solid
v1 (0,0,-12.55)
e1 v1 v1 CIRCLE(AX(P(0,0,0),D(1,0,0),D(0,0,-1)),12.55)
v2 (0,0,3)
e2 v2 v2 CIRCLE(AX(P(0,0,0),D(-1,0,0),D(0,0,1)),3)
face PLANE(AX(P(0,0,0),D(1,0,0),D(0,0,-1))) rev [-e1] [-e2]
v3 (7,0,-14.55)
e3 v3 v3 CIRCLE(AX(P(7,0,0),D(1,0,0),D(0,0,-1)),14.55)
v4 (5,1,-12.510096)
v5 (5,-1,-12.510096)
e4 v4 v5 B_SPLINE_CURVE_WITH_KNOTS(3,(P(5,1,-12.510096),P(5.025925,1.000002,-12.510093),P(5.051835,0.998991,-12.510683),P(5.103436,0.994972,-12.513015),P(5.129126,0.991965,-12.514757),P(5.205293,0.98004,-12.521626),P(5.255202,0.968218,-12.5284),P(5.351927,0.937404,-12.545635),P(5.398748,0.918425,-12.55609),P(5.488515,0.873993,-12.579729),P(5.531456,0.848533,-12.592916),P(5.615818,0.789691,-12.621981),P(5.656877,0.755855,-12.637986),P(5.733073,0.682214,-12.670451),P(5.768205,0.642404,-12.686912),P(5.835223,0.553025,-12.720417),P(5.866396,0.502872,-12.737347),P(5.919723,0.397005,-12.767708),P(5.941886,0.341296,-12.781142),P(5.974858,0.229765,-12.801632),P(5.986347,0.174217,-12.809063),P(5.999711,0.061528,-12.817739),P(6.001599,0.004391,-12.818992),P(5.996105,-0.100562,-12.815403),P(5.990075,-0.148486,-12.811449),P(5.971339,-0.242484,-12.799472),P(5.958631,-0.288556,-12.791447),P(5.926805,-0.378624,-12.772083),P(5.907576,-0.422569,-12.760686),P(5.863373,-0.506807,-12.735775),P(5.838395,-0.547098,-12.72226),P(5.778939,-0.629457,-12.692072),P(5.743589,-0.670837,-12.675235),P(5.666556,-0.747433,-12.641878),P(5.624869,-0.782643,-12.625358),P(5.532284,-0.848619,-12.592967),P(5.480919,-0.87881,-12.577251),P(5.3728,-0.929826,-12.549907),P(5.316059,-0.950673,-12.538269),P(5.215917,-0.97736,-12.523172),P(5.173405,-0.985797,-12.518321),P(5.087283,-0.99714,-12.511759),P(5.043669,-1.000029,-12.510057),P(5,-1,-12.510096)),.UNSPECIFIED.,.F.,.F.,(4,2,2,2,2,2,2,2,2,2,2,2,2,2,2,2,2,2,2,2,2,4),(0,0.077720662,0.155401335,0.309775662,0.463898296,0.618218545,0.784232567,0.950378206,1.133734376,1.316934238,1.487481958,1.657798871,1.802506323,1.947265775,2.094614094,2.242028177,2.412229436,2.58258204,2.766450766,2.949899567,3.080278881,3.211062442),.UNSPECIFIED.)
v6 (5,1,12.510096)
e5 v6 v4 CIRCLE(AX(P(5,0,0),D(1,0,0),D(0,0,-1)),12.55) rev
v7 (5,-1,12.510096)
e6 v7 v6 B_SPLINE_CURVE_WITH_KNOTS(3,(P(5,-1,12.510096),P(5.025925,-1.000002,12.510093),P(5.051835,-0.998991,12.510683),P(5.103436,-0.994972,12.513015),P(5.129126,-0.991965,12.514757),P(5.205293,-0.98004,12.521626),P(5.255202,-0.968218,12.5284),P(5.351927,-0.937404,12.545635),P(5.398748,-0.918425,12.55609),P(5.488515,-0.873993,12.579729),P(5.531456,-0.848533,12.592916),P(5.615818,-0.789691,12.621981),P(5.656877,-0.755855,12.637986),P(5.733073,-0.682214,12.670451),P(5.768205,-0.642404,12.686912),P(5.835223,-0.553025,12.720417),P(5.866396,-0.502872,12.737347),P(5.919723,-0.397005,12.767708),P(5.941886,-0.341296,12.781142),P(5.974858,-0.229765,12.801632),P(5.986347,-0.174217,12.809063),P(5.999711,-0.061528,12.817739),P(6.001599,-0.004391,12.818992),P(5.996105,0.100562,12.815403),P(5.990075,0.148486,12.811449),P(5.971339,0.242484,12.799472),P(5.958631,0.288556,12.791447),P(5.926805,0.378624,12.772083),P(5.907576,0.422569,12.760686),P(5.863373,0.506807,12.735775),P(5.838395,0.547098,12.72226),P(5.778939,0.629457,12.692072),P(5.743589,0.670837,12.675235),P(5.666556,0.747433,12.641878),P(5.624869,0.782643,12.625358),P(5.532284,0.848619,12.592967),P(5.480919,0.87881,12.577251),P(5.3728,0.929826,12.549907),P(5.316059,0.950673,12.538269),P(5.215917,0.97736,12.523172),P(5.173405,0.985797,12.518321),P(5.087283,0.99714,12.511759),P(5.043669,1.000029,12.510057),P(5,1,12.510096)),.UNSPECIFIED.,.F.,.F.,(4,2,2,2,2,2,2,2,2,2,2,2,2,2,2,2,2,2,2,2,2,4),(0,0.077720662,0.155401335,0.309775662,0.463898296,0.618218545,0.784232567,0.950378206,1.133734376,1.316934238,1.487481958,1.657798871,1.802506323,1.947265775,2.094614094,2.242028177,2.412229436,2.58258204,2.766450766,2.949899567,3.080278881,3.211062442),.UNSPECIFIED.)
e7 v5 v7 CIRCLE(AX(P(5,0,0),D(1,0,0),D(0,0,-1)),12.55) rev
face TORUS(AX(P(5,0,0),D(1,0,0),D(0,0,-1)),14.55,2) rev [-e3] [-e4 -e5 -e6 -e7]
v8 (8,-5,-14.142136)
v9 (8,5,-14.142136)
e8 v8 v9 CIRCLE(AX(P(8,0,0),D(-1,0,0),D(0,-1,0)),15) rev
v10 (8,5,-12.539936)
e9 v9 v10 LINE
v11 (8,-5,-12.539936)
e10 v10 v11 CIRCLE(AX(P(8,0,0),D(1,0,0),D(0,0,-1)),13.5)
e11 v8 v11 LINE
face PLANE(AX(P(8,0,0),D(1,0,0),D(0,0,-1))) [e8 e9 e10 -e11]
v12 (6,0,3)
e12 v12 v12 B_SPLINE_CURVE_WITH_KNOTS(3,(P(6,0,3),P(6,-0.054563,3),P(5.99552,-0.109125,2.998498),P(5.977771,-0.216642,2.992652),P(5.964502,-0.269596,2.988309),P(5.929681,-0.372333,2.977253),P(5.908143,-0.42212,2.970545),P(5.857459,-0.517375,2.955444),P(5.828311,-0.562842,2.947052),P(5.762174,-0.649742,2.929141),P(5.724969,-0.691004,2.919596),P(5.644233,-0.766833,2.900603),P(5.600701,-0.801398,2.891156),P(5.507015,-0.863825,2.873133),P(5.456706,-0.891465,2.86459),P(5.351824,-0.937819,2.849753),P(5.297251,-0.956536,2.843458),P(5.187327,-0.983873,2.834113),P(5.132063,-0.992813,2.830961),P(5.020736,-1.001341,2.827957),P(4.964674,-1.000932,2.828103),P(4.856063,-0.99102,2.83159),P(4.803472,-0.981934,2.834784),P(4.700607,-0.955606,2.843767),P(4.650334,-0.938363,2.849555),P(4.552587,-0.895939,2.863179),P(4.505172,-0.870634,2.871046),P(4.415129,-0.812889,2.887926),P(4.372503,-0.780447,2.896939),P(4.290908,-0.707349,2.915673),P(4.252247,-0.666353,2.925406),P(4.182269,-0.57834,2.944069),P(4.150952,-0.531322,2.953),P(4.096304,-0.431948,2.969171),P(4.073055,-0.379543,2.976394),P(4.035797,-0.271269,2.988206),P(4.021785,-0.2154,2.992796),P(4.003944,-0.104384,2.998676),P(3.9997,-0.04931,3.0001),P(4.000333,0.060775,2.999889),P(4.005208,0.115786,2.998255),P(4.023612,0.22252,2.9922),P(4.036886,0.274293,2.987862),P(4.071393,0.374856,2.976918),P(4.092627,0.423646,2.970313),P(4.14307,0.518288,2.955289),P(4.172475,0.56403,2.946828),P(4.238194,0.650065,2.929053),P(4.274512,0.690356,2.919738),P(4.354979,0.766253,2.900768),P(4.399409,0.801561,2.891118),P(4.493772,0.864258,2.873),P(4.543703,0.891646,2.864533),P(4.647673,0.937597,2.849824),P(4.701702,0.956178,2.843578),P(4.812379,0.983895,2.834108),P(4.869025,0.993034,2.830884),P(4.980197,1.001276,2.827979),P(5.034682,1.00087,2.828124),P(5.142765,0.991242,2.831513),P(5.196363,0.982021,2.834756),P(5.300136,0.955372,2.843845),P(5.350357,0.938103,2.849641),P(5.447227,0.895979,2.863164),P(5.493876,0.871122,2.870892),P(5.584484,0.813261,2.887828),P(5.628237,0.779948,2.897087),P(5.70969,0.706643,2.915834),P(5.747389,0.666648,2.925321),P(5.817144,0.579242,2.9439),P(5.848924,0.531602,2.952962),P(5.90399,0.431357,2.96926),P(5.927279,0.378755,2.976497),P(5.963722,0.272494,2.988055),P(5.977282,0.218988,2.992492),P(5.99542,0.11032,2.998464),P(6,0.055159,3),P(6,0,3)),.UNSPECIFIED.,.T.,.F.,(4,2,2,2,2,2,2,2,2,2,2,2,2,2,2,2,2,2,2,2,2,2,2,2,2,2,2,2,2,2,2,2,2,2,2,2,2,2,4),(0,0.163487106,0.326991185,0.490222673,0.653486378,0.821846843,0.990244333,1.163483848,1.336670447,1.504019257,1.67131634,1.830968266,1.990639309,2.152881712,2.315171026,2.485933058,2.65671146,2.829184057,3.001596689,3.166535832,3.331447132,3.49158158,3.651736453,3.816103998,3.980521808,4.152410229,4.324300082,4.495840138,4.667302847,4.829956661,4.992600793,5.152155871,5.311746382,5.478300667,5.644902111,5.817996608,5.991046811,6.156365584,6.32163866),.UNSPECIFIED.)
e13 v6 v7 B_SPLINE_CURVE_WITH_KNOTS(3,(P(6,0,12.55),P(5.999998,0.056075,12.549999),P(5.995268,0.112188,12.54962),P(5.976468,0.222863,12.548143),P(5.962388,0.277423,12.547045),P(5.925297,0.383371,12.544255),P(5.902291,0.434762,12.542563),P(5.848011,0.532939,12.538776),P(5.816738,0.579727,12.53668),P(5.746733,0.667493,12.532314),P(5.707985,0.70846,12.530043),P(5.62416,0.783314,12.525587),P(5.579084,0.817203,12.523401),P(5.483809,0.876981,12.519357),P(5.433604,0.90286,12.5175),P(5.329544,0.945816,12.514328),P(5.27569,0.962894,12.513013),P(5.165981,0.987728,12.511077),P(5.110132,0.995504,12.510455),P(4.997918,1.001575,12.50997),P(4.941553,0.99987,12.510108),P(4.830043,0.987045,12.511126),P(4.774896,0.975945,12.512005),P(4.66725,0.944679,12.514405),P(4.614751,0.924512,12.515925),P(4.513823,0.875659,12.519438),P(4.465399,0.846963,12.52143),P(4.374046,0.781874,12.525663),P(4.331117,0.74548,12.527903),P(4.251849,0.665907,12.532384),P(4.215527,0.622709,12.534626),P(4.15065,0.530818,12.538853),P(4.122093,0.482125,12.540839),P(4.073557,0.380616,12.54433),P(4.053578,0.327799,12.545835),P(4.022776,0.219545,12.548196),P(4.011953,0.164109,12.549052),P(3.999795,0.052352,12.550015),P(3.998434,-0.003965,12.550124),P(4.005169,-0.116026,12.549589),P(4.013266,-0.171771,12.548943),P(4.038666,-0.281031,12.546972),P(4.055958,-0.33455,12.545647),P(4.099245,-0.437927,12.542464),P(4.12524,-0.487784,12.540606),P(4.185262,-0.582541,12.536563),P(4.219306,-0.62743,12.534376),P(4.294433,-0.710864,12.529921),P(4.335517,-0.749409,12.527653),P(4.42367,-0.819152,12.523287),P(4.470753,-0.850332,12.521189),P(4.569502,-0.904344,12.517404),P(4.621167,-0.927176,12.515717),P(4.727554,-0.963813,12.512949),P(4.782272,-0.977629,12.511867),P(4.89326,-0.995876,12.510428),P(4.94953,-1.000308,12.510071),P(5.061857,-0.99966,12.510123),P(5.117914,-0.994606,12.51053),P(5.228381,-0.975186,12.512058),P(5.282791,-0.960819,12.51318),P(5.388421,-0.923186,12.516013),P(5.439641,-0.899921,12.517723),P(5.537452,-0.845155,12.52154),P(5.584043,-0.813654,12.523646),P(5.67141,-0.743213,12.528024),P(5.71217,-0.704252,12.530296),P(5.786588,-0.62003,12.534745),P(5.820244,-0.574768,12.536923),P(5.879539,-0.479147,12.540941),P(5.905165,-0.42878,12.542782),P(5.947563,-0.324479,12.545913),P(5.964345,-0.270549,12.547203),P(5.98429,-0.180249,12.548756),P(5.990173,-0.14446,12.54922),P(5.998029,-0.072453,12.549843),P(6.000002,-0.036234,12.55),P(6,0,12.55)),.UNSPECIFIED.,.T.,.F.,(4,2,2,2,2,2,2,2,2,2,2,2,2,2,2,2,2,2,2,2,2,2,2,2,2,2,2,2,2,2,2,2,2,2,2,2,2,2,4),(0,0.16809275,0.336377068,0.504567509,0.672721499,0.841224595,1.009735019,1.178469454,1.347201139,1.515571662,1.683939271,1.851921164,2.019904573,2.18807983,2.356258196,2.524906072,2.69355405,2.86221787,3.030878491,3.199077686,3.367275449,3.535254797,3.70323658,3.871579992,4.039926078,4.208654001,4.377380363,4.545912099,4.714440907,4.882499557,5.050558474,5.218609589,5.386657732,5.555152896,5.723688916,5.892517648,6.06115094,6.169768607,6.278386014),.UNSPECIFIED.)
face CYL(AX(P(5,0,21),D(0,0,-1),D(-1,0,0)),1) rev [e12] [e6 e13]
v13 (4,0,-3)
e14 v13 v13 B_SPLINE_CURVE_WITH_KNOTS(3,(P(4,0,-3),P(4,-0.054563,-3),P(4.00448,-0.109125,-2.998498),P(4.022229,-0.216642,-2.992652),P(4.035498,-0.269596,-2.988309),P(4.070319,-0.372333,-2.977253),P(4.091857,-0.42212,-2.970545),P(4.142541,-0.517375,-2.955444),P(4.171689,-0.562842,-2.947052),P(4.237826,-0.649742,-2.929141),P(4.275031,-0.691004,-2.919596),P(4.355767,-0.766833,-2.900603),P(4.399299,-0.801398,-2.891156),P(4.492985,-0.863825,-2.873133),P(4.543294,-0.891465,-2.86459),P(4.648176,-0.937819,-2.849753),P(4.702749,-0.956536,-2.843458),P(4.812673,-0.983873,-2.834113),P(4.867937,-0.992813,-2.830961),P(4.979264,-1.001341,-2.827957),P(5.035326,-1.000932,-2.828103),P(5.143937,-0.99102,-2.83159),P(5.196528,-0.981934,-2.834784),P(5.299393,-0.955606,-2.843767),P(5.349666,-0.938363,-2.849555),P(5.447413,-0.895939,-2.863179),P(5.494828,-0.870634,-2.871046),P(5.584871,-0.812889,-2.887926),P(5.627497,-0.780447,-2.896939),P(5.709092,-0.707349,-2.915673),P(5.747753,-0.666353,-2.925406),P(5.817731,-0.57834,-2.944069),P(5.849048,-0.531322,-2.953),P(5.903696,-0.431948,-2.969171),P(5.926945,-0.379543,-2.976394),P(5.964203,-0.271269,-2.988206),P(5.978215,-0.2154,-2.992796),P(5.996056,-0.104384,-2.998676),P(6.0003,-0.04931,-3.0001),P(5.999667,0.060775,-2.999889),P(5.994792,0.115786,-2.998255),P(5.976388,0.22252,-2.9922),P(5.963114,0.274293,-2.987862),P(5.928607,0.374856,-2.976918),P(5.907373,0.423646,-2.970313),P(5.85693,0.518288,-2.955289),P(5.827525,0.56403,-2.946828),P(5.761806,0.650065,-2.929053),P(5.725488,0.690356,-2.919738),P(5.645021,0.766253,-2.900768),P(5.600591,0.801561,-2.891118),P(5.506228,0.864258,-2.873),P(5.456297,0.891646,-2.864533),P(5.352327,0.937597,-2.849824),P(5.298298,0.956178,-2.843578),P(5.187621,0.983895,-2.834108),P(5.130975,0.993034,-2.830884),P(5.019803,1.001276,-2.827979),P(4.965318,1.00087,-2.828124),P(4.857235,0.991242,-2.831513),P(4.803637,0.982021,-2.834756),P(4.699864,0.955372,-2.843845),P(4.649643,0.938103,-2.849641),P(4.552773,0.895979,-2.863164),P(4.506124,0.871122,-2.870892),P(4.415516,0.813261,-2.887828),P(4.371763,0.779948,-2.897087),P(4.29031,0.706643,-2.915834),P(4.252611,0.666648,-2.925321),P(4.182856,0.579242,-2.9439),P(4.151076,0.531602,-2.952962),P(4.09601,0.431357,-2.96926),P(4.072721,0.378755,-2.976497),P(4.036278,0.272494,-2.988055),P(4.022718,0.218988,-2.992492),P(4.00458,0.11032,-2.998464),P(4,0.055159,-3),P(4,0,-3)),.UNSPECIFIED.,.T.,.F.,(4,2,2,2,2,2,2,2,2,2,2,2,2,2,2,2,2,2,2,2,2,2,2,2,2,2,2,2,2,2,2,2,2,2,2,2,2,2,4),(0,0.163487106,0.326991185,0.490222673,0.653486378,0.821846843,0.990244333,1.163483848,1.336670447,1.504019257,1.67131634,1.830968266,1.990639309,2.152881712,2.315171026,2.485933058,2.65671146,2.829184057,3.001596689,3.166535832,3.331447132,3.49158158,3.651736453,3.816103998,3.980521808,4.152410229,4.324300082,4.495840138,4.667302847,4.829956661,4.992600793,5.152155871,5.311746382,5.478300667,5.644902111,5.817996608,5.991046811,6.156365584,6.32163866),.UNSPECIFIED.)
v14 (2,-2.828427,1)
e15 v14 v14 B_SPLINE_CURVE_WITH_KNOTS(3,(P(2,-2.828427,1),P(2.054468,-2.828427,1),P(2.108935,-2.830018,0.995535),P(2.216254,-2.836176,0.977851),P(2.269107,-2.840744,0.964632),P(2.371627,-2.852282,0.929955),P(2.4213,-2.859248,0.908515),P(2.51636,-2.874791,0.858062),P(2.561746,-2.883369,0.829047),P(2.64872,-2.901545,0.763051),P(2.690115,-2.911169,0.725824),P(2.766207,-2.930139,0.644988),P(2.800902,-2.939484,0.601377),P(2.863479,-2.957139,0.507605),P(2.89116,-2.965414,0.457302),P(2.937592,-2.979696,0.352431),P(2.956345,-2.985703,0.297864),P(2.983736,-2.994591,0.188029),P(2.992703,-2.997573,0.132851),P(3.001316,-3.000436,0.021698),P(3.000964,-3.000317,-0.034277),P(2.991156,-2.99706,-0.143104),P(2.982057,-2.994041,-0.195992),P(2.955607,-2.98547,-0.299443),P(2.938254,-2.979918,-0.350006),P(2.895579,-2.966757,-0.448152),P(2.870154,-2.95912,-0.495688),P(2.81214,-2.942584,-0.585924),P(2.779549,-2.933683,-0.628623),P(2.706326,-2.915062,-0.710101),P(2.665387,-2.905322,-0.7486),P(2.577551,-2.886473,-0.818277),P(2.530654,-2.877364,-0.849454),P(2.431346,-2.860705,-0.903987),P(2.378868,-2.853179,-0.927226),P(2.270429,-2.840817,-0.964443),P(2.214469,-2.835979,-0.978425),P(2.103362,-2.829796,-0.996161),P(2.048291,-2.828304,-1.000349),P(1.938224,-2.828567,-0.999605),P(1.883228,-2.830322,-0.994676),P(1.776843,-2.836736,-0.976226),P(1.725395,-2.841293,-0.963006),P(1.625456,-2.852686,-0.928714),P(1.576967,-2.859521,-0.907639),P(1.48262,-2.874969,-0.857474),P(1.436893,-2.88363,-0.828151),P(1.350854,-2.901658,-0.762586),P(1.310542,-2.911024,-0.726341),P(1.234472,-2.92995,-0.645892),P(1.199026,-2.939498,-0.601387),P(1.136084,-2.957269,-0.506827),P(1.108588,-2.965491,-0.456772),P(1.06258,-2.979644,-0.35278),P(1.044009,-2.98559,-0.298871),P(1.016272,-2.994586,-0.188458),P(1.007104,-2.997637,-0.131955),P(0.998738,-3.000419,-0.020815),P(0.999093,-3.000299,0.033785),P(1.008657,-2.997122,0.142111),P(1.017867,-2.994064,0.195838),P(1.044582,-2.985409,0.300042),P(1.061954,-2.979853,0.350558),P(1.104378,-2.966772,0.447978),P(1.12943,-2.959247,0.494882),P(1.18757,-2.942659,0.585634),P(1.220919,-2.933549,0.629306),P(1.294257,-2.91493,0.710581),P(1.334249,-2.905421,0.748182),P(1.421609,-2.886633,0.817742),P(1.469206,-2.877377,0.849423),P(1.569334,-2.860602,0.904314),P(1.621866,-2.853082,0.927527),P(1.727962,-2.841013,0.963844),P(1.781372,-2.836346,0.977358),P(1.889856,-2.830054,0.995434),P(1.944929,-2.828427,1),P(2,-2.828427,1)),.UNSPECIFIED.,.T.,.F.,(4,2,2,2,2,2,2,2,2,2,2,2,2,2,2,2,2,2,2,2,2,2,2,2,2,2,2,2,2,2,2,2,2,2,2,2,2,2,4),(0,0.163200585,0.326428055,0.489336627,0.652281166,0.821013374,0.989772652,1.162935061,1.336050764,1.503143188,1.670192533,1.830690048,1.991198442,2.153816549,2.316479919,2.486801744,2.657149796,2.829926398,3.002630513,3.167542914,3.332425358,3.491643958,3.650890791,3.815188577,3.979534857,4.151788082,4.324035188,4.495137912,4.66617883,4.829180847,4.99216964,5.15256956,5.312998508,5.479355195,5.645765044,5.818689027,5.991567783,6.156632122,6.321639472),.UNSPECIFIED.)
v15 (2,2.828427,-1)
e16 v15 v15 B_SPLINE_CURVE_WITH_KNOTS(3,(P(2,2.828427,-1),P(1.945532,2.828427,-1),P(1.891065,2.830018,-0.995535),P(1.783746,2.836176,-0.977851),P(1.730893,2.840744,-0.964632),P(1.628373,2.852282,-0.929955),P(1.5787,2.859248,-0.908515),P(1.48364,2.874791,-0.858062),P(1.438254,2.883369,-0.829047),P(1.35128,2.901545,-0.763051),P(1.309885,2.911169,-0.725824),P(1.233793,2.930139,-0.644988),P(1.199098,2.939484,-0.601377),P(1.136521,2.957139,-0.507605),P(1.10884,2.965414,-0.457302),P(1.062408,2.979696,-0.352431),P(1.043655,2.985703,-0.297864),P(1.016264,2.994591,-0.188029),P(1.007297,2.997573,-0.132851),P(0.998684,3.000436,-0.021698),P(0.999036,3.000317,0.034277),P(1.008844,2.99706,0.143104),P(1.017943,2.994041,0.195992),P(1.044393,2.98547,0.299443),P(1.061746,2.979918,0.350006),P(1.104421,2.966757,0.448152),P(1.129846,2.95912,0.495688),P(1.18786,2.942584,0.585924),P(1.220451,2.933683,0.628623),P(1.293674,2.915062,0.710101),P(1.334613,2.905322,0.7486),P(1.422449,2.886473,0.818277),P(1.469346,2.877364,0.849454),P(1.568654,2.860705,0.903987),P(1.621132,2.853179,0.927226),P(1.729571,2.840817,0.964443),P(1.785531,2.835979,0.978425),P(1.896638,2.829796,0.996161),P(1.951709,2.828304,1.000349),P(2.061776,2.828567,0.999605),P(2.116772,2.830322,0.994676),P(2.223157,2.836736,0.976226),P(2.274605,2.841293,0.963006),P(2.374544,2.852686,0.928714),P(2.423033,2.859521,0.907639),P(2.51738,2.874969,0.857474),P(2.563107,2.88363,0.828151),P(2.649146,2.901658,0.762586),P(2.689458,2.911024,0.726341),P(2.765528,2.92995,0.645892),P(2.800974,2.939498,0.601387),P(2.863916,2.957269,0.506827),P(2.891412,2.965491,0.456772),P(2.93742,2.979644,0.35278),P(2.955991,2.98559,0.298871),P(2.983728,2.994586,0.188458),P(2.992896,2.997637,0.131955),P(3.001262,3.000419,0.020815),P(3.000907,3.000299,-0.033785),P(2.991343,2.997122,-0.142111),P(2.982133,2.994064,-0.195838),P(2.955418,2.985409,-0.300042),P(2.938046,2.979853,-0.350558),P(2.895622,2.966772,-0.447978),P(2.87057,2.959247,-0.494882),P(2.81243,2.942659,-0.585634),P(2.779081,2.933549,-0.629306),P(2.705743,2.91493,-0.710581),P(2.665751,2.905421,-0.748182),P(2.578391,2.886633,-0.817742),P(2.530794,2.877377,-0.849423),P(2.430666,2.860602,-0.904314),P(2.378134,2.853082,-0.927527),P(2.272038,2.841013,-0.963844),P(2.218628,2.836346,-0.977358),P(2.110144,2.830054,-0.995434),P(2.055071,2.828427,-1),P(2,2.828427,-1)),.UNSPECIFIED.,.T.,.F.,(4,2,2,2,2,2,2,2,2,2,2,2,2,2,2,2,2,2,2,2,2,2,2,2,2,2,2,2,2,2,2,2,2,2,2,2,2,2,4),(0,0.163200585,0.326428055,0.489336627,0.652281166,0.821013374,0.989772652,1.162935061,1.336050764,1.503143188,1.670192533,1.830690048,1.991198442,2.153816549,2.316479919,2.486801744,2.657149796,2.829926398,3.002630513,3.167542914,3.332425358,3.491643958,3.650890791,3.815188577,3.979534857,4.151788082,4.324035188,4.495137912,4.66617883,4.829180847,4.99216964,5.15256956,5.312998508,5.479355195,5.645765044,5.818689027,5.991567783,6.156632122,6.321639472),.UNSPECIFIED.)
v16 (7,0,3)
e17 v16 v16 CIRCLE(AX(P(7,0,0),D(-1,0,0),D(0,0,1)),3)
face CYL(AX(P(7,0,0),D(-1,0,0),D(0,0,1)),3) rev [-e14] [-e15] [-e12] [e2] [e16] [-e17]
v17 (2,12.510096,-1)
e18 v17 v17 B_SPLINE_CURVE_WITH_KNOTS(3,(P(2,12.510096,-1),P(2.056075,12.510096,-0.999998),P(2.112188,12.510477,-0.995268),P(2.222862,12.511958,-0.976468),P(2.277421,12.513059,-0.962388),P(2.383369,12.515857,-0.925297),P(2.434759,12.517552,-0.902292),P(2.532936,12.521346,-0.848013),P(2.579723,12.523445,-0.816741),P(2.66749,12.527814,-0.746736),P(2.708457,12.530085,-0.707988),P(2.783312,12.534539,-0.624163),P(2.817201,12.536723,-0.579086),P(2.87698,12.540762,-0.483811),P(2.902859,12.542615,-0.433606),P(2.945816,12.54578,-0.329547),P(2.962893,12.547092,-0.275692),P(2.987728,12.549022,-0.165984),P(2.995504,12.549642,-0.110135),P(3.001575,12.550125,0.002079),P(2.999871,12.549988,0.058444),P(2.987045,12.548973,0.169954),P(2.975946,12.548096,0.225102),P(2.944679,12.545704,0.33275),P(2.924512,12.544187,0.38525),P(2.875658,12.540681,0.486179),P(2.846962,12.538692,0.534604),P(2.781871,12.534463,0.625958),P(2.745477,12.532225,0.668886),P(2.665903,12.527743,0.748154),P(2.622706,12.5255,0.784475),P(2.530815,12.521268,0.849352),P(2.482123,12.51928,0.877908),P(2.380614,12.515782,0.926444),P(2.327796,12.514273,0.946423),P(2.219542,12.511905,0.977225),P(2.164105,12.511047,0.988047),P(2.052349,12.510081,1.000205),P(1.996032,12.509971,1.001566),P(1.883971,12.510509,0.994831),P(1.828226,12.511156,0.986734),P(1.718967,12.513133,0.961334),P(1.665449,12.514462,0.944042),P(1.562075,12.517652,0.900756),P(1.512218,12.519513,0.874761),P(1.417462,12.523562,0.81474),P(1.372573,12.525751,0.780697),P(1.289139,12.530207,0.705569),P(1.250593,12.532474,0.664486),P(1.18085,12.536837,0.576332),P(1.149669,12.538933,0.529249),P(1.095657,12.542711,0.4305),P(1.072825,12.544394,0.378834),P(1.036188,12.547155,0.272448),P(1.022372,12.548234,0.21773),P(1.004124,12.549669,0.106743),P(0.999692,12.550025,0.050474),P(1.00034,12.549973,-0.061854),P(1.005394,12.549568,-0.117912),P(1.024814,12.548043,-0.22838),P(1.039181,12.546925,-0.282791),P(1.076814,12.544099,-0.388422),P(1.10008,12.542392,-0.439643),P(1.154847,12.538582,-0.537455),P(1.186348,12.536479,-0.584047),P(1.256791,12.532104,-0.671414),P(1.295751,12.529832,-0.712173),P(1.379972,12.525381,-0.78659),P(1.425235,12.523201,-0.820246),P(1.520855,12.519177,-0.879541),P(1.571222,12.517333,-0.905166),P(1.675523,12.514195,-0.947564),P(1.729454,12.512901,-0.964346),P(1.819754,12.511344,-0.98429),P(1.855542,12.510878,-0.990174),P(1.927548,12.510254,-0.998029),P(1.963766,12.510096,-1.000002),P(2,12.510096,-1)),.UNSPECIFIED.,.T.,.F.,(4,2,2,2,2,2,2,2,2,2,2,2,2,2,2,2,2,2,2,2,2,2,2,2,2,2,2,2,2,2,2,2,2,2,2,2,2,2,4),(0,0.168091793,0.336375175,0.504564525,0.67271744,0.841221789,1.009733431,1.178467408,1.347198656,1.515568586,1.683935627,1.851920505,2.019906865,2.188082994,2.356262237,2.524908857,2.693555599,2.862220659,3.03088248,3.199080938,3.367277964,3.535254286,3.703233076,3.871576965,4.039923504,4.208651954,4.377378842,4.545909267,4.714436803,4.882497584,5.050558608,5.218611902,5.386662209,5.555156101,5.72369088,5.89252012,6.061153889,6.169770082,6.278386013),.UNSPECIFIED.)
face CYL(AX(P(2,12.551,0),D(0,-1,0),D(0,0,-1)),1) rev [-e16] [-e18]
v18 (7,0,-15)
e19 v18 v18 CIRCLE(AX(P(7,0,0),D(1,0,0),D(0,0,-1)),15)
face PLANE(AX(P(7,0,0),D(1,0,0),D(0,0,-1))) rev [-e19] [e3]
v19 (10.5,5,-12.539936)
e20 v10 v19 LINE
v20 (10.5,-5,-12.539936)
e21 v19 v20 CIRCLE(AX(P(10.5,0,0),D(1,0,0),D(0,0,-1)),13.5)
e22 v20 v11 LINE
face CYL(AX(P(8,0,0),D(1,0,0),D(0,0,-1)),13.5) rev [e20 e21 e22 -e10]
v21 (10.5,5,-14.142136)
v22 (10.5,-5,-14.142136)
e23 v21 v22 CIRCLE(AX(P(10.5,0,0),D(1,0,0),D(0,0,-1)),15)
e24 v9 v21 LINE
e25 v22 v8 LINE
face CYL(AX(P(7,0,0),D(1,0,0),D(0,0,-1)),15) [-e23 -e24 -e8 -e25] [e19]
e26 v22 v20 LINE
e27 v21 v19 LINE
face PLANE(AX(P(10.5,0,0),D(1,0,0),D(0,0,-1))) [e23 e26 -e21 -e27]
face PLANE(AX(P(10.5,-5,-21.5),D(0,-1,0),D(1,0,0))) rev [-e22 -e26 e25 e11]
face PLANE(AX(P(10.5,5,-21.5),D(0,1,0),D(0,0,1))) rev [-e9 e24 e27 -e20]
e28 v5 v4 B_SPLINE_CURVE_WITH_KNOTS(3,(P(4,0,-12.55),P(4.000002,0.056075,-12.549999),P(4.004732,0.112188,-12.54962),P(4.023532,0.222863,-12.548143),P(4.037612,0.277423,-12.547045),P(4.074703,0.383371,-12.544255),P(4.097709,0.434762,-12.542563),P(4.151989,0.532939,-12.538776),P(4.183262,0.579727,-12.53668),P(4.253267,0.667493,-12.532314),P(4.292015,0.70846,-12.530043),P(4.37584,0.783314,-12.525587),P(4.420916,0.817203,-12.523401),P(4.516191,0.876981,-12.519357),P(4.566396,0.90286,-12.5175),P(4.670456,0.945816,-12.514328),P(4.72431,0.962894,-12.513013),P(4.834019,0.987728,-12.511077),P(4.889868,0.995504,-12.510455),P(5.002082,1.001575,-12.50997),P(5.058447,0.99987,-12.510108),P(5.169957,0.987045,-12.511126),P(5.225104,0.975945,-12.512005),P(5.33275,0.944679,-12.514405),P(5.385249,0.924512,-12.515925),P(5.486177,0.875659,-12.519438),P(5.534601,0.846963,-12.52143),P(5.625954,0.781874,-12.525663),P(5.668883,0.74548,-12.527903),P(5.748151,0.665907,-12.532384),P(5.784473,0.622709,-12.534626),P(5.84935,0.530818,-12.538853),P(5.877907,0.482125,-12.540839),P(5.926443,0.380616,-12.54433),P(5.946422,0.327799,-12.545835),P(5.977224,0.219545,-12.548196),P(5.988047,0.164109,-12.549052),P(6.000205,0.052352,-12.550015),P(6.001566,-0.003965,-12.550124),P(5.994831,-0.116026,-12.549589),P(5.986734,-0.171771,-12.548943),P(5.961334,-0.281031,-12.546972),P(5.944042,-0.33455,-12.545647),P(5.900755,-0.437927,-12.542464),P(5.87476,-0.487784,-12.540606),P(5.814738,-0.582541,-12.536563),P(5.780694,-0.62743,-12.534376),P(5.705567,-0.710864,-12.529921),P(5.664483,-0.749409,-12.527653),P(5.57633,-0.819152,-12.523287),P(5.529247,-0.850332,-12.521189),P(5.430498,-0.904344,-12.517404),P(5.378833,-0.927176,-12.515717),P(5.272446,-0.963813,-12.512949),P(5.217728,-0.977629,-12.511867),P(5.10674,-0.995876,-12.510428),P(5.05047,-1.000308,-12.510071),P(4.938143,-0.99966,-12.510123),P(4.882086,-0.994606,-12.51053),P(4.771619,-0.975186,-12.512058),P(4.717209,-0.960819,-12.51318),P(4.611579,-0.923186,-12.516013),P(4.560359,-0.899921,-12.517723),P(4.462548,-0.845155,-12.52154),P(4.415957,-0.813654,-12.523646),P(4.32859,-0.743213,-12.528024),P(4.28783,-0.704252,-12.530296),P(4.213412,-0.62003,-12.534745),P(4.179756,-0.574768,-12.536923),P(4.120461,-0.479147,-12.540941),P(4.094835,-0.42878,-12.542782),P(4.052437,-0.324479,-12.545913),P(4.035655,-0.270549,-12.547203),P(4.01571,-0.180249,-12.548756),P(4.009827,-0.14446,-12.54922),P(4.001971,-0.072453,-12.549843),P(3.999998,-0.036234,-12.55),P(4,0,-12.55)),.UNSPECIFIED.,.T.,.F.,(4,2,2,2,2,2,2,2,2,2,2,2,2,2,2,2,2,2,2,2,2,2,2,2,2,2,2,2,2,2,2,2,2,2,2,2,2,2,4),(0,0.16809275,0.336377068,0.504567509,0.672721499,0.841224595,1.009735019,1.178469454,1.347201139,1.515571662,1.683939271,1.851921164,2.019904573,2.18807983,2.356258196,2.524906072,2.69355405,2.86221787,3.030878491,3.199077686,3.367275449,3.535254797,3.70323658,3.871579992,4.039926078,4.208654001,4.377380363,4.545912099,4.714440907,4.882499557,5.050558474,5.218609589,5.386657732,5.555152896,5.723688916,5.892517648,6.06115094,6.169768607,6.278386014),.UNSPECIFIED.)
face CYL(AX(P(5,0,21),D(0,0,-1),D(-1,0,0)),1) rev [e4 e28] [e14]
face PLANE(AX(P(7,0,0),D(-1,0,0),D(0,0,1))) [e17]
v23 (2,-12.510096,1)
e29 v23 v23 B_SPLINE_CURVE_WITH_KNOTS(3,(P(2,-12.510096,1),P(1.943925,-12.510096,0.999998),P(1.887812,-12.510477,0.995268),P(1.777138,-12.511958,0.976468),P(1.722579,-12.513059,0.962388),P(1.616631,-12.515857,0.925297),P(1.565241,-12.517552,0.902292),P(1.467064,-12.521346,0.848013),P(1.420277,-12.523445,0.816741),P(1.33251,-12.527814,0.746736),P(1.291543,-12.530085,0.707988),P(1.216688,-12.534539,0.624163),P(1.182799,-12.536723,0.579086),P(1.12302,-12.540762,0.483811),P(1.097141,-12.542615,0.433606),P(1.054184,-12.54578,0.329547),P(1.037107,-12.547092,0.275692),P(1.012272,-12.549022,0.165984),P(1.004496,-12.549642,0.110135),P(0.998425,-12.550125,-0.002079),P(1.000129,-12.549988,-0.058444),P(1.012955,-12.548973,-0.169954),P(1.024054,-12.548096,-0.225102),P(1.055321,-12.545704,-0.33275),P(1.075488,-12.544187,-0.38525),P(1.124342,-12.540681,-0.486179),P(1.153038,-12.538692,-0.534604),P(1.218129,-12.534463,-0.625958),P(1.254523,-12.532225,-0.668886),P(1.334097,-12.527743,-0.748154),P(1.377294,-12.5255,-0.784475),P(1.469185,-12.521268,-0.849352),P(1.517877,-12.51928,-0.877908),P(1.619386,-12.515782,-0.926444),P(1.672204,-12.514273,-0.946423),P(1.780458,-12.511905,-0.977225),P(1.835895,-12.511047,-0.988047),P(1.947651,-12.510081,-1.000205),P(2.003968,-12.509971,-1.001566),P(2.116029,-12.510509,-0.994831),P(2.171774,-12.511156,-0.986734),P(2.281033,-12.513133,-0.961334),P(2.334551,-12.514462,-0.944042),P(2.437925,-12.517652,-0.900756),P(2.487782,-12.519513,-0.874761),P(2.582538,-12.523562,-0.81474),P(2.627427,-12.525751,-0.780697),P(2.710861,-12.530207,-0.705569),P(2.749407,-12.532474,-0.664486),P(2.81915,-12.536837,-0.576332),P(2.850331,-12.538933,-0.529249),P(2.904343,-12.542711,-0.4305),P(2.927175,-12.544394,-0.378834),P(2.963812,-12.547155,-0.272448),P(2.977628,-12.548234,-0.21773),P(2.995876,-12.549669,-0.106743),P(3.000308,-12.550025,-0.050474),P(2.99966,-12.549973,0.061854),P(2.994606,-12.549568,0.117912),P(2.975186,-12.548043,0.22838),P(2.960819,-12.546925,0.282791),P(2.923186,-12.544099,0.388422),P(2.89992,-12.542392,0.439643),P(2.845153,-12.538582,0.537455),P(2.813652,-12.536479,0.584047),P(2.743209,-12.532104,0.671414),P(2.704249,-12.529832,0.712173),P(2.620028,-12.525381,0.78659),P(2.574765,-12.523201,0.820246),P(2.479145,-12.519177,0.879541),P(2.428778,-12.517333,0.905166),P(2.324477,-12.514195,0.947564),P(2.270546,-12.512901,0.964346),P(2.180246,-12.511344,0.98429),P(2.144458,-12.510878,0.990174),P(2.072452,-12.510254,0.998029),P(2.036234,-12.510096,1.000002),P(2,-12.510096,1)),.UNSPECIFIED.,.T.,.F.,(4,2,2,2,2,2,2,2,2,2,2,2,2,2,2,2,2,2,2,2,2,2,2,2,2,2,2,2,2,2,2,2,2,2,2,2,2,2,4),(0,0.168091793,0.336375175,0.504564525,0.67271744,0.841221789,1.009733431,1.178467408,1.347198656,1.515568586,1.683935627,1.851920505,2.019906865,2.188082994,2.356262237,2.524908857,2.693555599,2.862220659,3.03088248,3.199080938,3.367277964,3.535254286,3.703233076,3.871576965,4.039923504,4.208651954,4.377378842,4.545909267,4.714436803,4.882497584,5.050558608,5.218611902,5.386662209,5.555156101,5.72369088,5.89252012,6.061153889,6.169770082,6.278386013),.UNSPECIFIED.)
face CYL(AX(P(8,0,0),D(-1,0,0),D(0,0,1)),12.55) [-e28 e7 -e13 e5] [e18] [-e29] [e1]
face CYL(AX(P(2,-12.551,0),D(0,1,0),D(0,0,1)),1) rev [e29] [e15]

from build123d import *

# Parameters (mm, degrees)
SKETCH_1_R                      = 12.55
EXTRUDE_1_DEPTH                 = 8
SKETCH_2_R                      = 3
CUT_EXTRUDE_1_DEPTH             = 7
CUT_EXTRUDE_2_REACH             = 21.468
SKETCH_3_R                      = 1
CUT_EXTRUDE_2_DIRECTION_2_REACH = 21.468
CUT_EXTRUDE_3_DEPTH             = 21
CUT_EXTRUDE_3_DEPTH_BACK        = 19
SKETCH_4_R                      = 1
EXTRUDE_2_DEPTH                 = 2.5
EXTRUDE_2_DEPTH_BACK            = 1
SKETCH_5_R                      = 15
SKETCH_6_R                      = 13.5
CUT_EXTRUDE_4_DEPTH             = 2.5
FILLET_1_R                      = 2
SKETCH_7_W                      = 2.5
SKETCH_7_H                      = 10
CUT_EXTRUDE_5_DEPTH             = 21.5


with BuildPart() as part:
    # 草图1 → 凸台-拉伸1 (new body)
    with BuildSketch(Plane(origin=(0, 0, 0), x_dir=(0, 0, -1), z_dir=(1, 0, 0))):
        Circle(SKETCH_1_R)
    extrude(amount=EXTRUDE_1_DEPTH)

    # 草图2 → 切除-拉伸1 (cut)
    with BuildSketch(Plane.ZY):
        Circle(SKETCH_2_R)
    extrude(amount=-CUT_EXTRUDE_1_DEPTH, mode=Mode.SUBTRACT)

    # 草图3 → 切除-拉伸2 (cut, up to next)
    with BuildSketch(Plane(origin=(0, 0, 0), x_dir=(1, 0, 0), z_dir=(0, 1, 0)), mode=Mode.PRIVATE) as cut_extrude_2_sk1:
        with Locations(Location((2, 0, 0), (0, 0, 270))):
            Circle(SKETCH_3_R)
    cut_extrude_2_tool1 = extrude(cut_extrude_2_sk1.sketch, amount=-CUT_EXTRUDE_2_REACH, mode=Mode.PRIVATE) & part.part
    add(cut_extrude_2_tool1.solids().sort_by_distance((2, 0, 0))[0], mode=Mode.SUBTRACT)

    # 草图3 → 切除-拉伸2 direction 2 (cut, up to next)
    with BuildSketch(Plane(origin=(0, 0, 0), x_dir=(1, 0, 0), z_dir=(0, 1, 0)), mode=Mode.PRIVATE) as cut_extrude_2_direction_2_sk1:
        with Locations(Location((2, 0, 0), (0, 0, 270))):
            Circle(SKETCH_3_R)
    cut_extrude_2_direction_2_tool1 = extrude(cut_extrude_2_direction_2_sk1.sketch, amount=CUT_EXTRUDE_2_DIRECTION_2_REACH, mode=Mode.PRIVATE) & part.part
    add(cut_extrude_2_direction_2_tool1.solids().sort_by_distance((2, 0, 0))[0], mode=Mode.SUBTRACT)

    # 草图4 → 切除-拉伸3 (cut, two sides: drawn at the far end of the back side and taken through both)
    with BuildSketch(Plane.XY.offset(-CUT_EXTRUDE_3_DEPTH_BACK)):
        with Locations(Location((5, 0, 0), (0, 0, 180))):
            Circle(SKETCH_4_R)
    extrude(amount=CUT_EXTRUDE_3_DEPTH + CUT_EXTRUDE_3_DEPTH_BACK, mode=Mode.SUBTRACT)

    # 草图5 → 凸台-拉伸2 (add, two sides: drawn at the far end of the back side and taken through both)
    with BuildSketch(Plane(origin=(8, 0, 0), x_dir=(0, 0, -1), z_dir=(1, 0, 0)).offset(-EXTRUDE_2_DEPTH_BACK)):
        Circle(SKETCH_5_R)
    extrude(amount=EXTRUDE_2_DEPTH + EXTRUDE_2_DEPTH_BACK)

    # 草图6 → 切除-拉伸4 (cut)
    with BuildSketch(Plane(origin=(10.5, 0, 0), x_dir=(0, 0, -1), z_dir=(1, 0, 0))):
        Circle(SKETCH_6_R)
    extrude(amount=-CUT_EXTRUDE_4_DEPTH, mode=Mode.SUBTRACT)

    # 圆角1
    # the kernel refuses this fillet: 2 mm, written as the material it adds along each edge
    with BuildSketch(Plane(origin=(7, 0, 0), x_dir=(0, 0, -1), z_dir=(0, 1, 0))) as fillet_1_piece_1_section:
        with BuildLine():
            CenterArc((12.55 + FILLET_1_R, FILLET_1_R), FILLET_1_R, 180, 90)
            Line((12.55 + FILLET_1_R, 0), (12.55, 0))
            Line((12.55, 0), (12.55, FILLET_1_R))
        make_face()
    fillet_1_piece_1 = revolve(axis=Axis((7, 0, 0), (-1, 0, 0)), mode=Mode.PRIVATE)
    fillet_1_piece_1 = fillet_1_piece_1 - Plane(origin=(5, 0, 13.104940956), x_dir=(-1, 0, 0), z_dir=(0, 0, 1)) * Cylinder(1, 59, mode=Mode.PRIVATE)
    add(fillet_1_piece_1)

    # 草图7 → 切除-拉伸5 (cut)
    with BuildSketch(Plane.XY):
        with Locations((9.25, 0)):
            Rectangle(SKETCH_7_W, SKETCH_7_H)
    extrude(amount=-CUT_EXTRUDE_5_DEPTH, mode=Mode.SUBTRACT)


solid = part.part
